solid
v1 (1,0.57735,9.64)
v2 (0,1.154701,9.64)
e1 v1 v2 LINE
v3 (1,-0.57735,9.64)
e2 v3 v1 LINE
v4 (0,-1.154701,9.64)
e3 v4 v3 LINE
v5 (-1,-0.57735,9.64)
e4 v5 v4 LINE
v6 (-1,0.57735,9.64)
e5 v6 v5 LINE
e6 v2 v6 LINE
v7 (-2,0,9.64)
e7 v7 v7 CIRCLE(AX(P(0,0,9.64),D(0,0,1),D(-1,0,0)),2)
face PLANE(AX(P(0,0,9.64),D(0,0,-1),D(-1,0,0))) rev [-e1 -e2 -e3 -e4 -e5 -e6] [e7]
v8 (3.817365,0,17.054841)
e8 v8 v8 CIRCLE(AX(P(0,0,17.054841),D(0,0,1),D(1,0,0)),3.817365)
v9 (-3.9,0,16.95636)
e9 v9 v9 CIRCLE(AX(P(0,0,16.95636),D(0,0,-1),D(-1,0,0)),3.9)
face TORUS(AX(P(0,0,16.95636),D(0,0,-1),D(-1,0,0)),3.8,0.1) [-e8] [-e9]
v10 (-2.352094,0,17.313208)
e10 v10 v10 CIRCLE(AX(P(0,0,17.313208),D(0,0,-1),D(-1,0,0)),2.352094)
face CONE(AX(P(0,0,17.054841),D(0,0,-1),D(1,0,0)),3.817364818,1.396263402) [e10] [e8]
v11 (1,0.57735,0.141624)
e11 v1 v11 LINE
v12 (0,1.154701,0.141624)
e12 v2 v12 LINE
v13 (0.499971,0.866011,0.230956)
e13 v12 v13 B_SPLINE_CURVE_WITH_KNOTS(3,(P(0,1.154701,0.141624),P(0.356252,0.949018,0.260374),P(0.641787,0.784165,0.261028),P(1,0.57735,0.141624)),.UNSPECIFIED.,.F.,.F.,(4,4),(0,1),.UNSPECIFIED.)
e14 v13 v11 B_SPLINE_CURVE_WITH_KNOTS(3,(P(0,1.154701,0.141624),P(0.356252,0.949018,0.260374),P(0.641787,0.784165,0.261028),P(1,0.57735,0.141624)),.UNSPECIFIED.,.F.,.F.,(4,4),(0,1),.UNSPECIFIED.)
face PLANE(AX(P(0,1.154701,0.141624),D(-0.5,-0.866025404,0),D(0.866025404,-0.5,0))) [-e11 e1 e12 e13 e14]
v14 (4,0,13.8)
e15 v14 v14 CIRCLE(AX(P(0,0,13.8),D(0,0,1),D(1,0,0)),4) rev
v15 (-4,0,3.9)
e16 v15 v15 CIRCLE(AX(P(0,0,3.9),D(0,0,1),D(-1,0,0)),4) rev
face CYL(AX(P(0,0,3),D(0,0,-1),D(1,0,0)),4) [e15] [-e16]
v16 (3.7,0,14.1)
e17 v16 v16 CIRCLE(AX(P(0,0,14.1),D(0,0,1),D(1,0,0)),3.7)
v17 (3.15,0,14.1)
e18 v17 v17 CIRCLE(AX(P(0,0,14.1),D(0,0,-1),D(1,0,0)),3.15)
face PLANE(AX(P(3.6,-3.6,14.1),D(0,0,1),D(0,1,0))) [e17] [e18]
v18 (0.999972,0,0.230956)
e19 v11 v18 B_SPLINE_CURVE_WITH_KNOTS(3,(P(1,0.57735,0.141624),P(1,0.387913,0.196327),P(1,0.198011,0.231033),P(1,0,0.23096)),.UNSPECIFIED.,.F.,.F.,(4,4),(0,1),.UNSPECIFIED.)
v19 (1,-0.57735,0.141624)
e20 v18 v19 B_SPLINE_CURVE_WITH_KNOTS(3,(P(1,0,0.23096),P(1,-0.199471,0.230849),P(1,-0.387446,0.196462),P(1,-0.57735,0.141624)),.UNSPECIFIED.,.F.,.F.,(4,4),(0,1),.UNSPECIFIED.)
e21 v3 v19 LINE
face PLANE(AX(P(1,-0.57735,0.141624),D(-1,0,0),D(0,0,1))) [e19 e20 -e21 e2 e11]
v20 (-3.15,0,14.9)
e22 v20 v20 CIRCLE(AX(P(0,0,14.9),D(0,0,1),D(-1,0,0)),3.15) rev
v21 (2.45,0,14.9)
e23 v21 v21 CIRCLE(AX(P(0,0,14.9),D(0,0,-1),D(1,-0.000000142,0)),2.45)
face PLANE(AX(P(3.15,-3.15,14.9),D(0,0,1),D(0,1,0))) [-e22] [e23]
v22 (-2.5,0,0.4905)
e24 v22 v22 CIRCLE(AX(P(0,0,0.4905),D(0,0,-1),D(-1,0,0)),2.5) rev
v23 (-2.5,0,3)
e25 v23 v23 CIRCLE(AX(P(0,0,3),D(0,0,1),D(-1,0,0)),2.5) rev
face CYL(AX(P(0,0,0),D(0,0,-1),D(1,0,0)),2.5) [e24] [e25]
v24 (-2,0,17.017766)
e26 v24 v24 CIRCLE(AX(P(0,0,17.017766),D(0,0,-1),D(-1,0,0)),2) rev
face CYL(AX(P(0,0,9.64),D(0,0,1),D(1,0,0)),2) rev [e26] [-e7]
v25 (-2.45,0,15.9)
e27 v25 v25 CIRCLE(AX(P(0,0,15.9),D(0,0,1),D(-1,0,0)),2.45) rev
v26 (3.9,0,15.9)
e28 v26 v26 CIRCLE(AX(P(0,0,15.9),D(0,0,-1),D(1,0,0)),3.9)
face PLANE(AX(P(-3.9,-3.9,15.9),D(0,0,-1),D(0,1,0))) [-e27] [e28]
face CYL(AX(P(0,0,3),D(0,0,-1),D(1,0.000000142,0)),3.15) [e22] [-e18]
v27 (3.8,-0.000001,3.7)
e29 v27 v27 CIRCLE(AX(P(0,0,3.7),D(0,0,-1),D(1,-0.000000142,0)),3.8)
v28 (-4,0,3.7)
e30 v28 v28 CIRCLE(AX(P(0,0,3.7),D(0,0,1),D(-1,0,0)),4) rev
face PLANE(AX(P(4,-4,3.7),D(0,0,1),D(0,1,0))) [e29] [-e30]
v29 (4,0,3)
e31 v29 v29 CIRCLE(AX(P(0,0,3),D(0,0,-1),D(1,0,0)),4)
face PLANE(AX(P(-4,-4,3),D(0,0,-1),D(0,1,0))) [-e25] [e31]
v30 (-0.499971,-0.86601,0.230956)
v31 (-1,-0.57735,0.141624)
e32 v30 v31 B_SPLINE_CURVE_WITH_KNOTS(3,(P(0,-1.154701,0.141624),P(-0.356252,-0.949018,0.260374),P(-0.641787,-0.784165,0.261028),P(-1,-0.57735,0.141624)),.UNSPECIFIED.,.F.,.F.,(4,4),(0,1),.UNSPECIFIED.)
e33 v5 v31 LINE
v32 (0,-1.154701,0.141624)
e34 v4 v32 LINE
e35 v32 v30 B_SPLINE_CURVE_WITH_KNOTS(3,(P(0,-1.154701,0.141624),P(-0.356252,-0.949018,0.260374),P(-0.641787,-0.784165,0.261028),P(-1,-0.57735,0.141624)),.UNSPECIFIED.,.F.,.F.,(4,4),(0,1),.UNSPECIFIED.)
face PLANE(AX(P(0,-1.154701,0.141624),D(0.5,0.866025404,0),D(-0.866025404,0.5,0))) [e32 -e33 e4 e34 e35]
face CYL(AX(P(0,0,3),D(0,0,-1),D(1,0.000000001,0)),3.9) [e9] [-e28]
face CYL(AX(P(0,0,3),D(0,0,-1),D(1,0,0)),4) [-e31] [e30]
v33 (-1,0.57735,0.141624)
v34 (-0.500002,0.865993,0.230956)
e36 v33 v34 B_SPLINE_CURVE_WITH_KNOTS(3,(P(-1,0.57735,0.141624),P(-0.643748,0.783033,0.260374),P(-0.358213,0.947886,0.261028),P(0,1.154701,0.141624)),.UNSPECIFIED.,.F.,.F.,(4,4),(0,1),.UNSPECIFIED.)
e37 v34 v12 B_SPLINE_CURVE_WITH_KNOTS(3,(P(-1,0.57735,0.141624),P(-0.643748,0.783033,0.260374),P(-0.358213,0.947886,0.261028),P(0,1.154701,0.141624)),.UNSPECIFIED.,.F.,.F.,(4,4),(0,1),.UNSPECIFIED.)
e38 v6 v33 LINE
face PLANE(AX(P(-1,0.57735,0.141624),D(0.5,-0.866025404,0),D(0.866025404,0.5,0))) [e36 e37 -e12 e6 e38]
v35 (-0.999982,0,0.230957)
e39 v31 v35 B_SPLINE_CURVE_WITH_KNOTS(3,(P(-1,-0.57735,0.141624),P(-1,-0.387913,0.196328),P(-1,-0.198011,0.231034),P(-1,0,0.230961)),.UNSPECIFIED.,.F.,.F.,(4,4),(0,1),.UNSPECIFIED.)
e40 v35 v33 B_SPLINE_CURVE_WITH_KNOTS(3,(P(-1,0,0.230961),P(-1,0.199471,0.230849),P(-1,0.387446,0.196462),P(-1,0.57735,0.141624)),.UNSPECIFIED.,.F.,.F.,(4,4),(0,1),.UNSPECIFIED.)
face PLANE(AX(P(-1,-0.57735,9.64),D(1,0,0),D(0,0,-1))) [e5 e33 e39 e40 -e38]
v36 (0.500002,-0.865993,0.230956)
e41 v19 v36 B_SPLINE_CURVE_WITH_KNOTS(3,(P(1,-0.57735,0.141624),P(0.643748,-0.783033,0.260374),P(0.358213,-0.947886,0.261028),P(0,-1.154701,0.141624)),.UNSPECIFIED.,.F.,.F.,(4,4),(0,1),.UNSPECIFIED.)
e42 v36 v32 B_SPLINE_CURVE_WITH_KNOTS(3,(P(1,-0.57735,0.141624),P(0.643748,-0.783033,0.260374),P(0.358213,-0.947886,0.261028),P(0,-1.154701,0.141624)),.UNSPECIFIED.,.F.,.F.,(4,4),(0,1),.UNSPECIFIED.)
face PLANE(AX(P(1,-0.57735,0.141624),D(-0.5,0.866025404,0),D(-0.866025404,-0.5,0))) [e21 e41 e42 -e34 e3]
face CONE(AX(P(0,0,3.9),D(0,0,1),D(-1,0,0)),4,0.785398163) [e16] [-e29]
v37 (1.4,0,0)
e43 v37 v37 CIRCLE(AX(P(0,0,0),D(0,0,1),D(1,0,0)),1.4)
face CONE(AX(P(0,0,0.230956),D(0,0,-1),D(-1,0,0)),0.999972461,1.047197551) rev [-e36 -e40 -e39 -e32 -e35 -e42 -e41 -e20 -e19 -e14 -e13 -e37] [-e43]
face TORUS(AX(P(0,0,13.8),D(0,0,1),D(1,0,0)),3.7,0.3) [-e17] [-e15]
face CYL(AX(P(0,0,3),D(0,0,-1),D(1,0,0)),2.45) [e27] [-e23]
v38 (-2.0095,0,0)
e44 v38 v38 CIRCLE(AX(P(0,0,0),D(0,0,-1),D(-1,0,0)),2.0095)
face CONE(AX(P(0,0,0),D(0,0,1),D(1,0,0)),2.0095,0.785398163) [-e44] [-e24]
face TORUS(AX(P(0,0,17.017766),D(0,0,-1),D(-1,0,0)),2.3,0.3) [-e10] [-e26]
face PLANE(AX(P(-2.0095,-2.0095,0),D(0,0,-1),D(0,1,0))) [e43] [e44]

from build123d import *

# Parameters (mm, degrees)
CUT_EXTRUDE1_2_OUTLINE_R = 2
CUT_EXTRUDE1_2_DEPTH     = 9.64
CUT_EXTRUDE1_3_DEPTH     = 0.141623609
CHAMFER1_SIZE            = 0.4905
FILLET1_R                = 0.1
FILLET2_R                = 0.3


with BuildPart() as part:
    # Cut-Extrude1: read off the stored shape, not the designer's step
    # Cut-Extrude1 outline → Cut-Extrude1 (revolve)
    with BuildSketch(Plane.XZ):
        Polygon((3.8, 3.7), (4, 3.9), (4, 14.1), (3.15, 14.1), (3.15, 14.9), (2.45, 14.9), (2.45, 15.9), (3.9, 15.9), (3.9, 17.040270357), (2, 17.375291621), (2, 0), (2.5, 0), (2.5, 3), (4, 3), (4, 3.7), align=None)
    revolve(axis=Axis((0, 0, 0), (0, 0, 1)))

    # Cut-Extrude1 2 outline → Cut-Extrude1 2 (add)
    with BuildSketch(Plane.XY):
        Circle(CUT_EXTRUDE1_2_OUTLINE_R)
        Polygon((1, -0.577350269), (0, -1.154700538), (-1, -0.577350269), (-1, 0.577350269), (0, 1.154700538), (1, 0.577350269), align=None, mode=Mode.SUBTRACT)
    extrude(amount=CUT_EXTRUDE1_2_DEPTH)

    # Cut-Extrude1 3 outline → Cut-Extrude1 3 (add)
    with BuildSketch(Plane.XY):
        Polygon((-1, -0.577350269), (0, -1.154700538), (1, -0.577350269), (1, 0.57735027), (0, 1.154700538), (-1, 0.577350269), align=None)
    extrude(amount=CUT_EXTRUDE1_3_DEPTH)

    # Cut-Extrude1 4 outline → Cut-Extrude1 4 (revolve)
    with BuildSketch(Plane.XZ):
        Polygon((0.999972461, 0.230956007), (0, 0.230956007), (0, 0.141623609), (1.154700539, 0.141623609), align=None)
    revolve(axis=Axis((0, 0, 0), (0, 0, 1)))

    # Sketch2 → Cut-Revolve1 (revolve, cut)
    with BuildSketch(Plane(origin=(0, 0, 0), x_dir=(1, 0, 0), z_dir=(0, 1, 0)), mode=Mode.PRIVATE) as cut_revolve1_sk:
        Polygon((1.4, 0), (0, 0), (0, -0.230956007), (0.999972461, -0.230956007), align=None)
    revolve(cut_revolve1_sk.sketch.rotate(Axis((0, 0, 0), (0, 0, 1)), 180), axis=Axis((0, 0, 0), (0, 0, 1)), mode=Mode.SUBTRACT)

    # Chamfer1
    chamfer1_edges = [part.edges().sort_by_distance(p)[0] for p in [
        (-2.5, 0, 0),
    ]]
    chamfer(chamfer1_edges, length=CHAMFER1_SIZE)

    # Fillet1
    fillet1_edges = [part.edges().sort_by_distance(p)[0] for p in [
        (-3.9, 0, 17.040270357),
    ]]
    fillet(fillet1_edges, radius=FILLET1_R)

    # Fillet2
    fillet2_edges = [part.edges().sort_by_distance(p)[0] for p in [
        (-2, 0, 17.375291621),
        (-4, 0, 14.1),
    ]]
    fillet(fillet2_edges, radius=FILLET2_R)


solid = part.part
